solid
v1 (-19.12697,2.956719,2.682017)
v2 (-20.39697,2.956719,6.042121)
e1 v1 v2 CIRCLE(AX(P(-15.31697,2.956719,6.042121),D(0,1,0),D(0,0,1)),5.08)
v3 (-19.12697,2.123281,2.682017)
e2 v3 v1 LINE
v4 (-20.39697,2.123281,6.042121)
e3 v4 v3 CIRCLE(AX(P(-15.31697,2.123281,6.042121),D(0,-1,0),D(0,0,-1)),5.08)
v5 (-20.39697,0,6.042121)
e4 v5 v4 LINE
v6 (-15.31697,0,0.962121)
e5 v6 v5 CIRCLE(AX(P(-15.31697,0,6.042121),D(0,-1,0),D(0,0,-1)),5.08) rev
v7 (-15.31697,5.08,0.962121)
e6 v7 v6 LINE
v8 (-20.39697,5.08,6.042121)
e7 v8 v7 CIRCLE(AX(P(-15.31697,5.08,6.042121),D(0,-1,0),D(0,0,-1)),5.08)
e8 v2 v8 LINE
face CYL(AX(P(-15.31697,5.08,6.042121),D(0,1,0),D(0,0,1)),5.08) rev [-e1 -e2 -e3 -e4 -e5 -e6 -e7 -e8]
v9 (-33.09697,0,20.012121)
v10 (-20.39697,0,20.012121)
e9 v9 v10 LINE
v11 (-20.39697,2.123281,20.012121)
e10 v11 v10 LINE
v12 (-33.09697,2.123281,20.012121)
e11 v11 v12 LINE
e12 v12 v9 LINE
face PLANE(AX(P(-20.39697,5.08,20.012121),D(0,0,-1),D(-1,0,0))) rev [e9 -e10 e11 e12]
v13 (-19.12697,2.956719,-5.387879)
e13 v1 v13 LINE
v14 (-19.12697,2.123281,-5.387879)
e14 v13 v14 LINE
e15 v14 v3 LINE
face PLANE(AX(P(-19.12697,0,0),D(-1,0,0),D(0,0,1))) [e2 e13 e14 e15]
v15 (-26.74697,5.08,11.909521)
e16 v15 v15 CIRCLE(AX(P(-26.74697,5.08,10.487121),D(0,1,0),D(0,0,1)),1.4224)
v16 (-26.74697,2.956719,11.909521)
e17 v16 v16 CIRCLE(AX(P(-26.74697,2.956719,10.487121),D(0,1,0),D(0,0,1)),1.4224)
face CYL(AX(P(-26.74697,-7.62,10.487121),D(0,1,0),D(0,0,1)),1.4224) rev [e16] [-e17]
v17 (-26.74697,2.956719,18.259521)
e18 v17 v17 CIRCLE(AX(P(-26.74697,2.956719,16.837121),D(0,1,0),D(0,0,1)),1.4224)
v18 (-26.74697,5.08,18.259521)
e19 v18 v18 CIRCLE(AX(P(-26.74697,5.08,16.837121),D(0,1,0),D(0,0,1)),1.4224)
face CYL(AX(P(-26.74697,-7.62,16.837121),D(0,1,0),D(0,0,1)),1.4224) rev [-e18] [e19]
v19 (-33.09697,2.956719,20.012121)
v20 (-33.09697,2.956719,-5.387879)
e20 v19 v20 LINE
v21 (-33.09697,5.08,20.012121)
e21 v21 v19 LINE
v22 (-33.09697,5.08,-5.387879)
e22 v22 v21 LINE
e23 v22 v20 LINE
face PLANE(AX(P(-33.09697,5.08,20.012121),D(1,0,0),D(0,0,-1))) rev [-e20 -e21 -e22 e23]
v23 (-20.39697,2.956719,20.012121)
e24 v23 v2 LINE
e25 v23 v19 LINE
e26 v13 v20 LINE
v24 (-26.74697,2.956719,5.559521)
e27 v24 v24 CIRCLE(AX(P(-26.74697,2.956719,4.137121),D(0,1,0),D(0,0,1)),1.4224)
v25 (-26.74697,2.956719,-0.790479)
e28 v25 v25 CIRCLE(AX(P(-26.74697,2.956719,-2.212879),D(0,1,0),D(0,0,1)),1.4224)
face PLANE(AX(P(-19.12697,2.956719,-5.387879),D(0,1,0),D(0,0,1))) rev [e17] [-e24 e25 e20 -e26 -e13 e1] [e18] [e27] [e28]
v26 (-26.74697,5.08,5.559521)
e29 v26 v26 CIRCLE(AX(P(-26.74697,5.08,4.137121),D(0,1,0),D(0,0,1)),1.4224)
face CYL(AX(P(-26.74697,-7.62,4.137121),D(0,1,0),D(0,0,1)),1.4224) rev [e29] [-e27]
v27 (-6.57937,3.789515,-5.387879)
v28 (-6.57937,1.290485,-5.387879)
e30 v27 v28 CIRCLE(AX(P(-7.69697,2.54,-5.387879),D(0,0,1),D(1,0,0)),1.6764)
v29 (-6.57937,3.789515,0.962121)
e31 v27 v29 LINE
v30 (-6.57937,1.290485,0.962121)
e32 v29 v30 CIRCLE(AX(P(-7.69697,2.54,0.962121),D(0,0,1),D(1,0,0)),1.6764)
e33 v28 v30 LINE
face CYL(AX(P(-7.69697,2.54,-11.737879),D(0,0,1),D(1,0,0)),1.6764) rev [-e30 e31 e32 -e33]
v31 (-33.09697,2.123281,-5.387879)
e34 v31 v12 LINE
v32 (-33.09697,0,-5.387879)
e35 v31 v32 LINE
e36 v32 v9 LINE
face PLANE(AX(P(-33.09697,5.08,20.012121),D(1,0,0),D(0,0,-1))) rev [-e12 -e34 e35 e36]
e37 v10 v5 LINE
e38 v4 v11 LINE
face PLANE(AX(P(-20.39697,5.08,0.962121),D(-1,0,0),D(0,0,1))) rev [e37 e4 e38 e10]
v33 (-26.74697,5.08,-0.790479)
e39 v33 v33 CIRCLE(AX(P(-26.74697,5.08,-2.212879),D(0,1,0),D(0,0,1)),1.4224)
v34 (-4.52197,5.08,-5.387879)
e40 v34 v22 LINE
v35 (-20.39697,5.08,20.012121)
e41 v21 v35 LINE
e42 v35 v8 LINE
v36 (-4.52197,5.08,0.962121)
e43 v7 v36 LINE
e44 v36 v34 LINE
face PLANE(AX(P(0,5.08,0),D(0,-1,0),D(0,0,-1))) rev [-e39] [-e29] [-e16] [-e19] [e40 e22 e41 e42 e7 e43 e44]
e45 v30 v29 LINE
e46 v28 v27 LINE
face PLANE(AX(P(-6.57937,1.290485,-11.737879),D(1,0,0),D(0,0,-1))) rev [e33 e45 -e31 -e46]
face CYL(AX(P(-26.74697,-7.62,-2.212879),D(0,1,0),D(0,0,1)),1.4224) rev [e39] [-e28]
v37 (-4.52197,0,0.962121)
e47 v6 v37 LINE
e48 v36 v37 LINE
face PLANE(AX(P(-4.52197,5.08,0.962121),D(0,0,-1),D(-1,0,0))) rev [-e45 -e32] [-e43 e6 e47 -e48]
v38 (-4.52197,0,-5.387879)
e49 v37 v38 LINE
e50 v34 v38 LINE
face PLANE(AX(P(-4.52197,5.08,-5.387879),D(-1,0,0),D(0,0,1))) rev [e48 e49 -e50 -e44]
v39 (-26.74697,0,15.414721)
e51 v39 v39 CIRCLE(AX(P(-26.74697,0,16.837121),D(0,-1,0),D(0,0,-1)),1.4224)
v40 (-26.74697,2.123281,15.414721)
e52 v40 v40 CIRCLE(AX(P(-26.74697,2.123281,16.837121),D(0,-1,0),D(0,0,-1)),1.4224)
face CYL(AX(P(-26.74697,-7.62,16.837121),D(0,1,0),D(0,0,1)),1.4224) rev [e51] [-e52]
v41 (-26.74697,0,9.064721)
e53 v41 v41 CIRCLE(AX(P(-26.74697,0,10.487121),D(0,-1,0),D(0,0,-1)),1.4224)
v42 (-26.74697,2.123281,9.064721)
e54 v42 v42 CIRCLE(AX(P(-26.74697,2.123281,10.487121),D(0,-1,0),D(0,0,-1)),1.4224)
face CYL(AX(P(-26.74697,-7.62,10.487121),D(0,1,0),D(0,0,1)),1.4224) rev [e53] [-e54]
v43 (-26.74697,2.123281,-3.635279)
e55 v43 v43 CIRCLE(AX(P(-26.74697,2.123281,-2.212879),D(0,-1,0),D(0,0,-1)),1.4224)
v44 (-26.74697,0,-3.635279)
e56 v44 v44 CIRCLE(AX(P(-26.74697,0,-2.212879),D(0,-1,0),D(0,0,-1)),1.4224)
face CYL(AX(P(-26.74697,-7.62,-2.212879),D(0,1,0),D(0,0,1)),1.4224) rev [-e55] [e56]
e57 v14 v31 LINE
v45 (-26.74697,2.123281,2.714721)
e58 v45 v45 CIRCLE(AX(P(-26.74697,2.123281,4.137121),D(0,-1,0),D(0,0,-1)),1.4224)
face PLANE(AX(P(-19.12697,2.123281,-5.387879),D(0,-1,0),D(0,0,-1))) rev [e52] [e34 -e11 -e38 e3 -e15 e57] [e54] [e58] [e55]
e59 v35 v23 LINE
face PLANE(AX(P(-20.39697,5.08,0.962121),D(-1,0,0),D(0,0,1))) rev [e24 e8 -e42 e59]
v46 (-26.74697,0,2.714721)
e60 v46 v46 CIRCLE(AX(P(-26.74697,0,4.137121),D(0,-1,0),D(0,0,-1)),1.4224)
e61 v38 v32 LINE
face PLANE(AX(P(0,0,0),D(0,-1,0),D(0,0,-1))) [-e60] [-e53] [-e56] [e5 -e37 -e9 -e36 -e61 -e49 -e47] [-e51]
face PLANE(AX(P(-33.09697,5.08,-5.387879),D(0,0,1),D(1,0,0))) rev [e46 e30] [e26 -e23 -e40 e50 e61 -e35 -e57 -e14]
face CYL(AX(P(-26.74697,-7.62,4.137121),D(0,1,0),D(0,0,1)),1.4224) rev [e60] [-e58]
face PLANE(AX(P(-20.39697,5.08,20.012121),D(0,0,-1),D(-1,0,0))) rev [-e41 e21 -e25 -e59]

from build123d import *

# Parameters (mm, degrees)
BOSS_EXTRUDE1_DEPTH = 5.08
SKETCH2_W           = 25.4
SKETCH2_H           = 0.8334375
CUT_EXTRUDE1_DEPTH  = 13.97
SKETCH3_R           = 1.4224
CUT_EXTRUDE2_DEPTH  = 12.7
CUT_EXTRUDE3_DEPTH  = 12.7
FILLET3_R           = 5.08


with BuildPart() as part:
    # Sketch1 → Boss-Extrude1 (new body)
    with BuildSketch(Plane(origin=(0, 0, 0), x_dir=(1, 0, 0), z_dir=(0, 1, 0))):
        Polygon((-33.096969697, 5.387878788), (-20.396969697, 5.387878788), (-4.521969697, 5.387878788), (-4.521969697, -0.962121212), (-20.396969697, -0.962121212), (-20.396969697, -20.012121212), (-33.096969697, -20.012121212), align=None)
    extrude(amount=BOSS_EXTRUDE1_DEPTH)

    # Sketch2 → Cut-Extrude1 (cut)
    with BuildSketch(Plane.ZY.offset(33.096969697)):
        with Locations((7.312121212, 2.54)):
            Rectangle(SKETCH2_W, SKETCH2_H)
    extrude(amount=-CUT_EXTRUDE1_DEPTH, mode=Mode.SUBTRACT)

    # Sketch3 → Cut-Extrude2 (cut)
    with BuildSketch(Plane(origin=(0, 5.08, 0), x_dir=(1, 0, 0), z_dir=(0, 1, 0))):
        with Locations(Location((-26.746969697, -16.837121212, 0), (0, 0, 90))):
            Circle(SKETCH3_R)
        with Locations(Location((-26.746969697, -10.487121212, 0), (0, 0, 90))):
            Circle(SKETCH3_R)
        with Locations(Location((-26.746969697, -4.137121212, 0), (0, 0, 90))):
            Circle(SKETCH3_R)
        with Locations(Location((-26.746969697, 2.212878788, 0), (0, 0, 90))):
            Circle(SKETCH3_R)
    extrude(amount=-CUT_EXTRUDE2_DEPTH, mode=Mode.SUBTRACT)

    # Sketch5 → Cut-Extrude3 (cut)
    with BuildSketch(Plane.XY.offset(0.962121212)):
        with BuildLine():
            Line((-6.579369697, 1.290485214), (-6.579369697, 3.789514786))
            ThreePointArc((-6.579369697, 3.789514786), (-9.373369697, 2.54), (-6.579369697, 1.290485214))
        make_face()
    extrude(amount=-CUT_EXTRUDE3_DEPTH, mode=Mode.SUBTRACT)

    # Fillet3
    # the kernel refuses this fillet: 5.08 mm, written as the material it adds along each edge
    with BuildSketch(Plane(origin=(-20.396969697, -9.74328125, 0.962121212), x_dir=(1, 0, 0), z_dir=(0, 1, 0))) as fillet3_piece_1_section:
        with BuildLine():
            CenterArc((FILLET3_R, -FILLET3_R), FILLET3_R, 90, 90)
            Line((0, -FILLET3_R), (0, 0))
            Line((0, 0), (FILLET3_R, 0))
        make_face()
    fillet3_piece_1 = extrude(amount=14.82328125, mode=Mode.PRIVATE)
    fillet3_piece_1 = split(fillet3_piece_1, bisect_by=Plane(origin=(-18.050290176, 0, 1.370319311), z_dir=(0, 1, 0)), keep=Keep.TOP, mode=Mode.PRIVATE)
    fillet3_piece_1 = split(fillet3_piece_1, bisect_by=Plane(origin=(-18.050290176, 2.12328125, 1.370319311), z_dir=(0, -1, 0)), keep=Keep.TOP, mode=Mode.PRIVATE)
    fillet3_piece_1 = split(fillet3_piece_1, bisect_by=Plane(origin=(-19.126969697, 1.061640625, 1.370319311), z_dir=(1, 0, 0)), keep=Keep.TOP, mode=Mode.PRIVATE)
    add(fillet3_piece_1)
    with BuildSketch(Plane(origin=(-20.396969697, -9.74328125, 0.962121212), x_dir=(1, 0, 0), z_dir=(0, 1, 0))) as fillet3_piece_2_section:
        with BuildLine():
            CenterArc((FILLET3_R, -FILLET3_R), FILLET3_R, 90, 90)
            Line((0, -FILLET3_R), (0, 0))
            Line((0, 0), (FILLET3_R, 0))
        make_face()
    fillet3_piece_2 = extrude(amount=14.82328125, mode=Mode.PRIVATE)
    fillet3_piece_2 = split(fillet3_piece_2, bisect_by=Plane(origin=(-19.932991251, 0, 2.537596858), z_dir=(0, 1, 0)), keep=Keep.TOP, mode=Mode.PRIVATE)
    fillet3_piece_2 = split(fillet3_piece_2, bisect_by=Plane(origin=(-19.932991251, 2.12328125, 2.537596858), z_dir=(0, -1, 0)), keep=Keep.TOP, mode=Mode.PRIVATE)
    fillet3_piece_2 = split(fillet3_piece_2, bisect_by=Plane(origin=(-19.126969697, 1.061640625, 2.537596858), z_dir=(-1, 0, 0)), keep=Keep.TOP, mode=Mode.PRIVATE)
    add(fillet3_piece_2)
    with BuildSketch(Plane(origin=(-20.396969697, -9.74328125, 0.962121212), x_dir=(1, 0, 0), z_dir=(0, 1, 0))) as fillet3_piece_3_section:
        with BuildLine():
            CenterArc((FILLET3_R, -FILLET3_R), FILLET3_R, 90, 90)
            Line((0, -FILLET3_R), (0, 0))
            Line((0, 0), (FILLET3_R, 0))
        make_face()
    fillet3_piece_3 = extrude(amount=14.82328125, mode=Mode.PRIVATE)
    fillet3_piece_3 = split(fillet3_piece_3, bisect_by=Plane(origin=(-18.050290176, 2.12328125, 1.370319311), z_dir=(0, 1, 0)), keep=Keep.TOP, mode=Mode.PRIVATE)
    fillet3_piece_3 = split(fillet3_piece_3, bisect_by=Plane(origin=(-19.126969697, 2.54, 1.370319311), z_dir=(1, 0, 0)), keep=Keep.TOP, mode=Mode.PRIVATE)
    fillet3_piece_3 = split(fillet3_piece_3, bisect_by=Plane(origin=(-18.050290176, 2.95671875, 1.370319311), z_dir=(0, -1, 0)), keep=Keep.TOP, mode=Mode.PRIVATE)
    add(fillet3_piece_3)
    with BuildSketch(Plane(origin=(-20.396969697, 2.95671875, 0.962121212), x_dir=(1, 0, 0), z_dir=(0, 1, 0))) as fillet3_piece_4_section:
        with BuildLine():
            CenterArc((FILLET3_R, -FILLET3_R), FILLET3_R, 90, 90)
            Line((0, -FILLET3_R), (0, 0))
            Line((0, 0), (FILLET3_R, 0))
        make_face()
    fillet3_piece_4 = extrude(amount=2.12328125, mode=Mode.PRIVATE)
    fillet3_piece_4 = split(fillet3_piece_4, bisect_by=Plane(origin=(-19.126969697, 4.018359375, 1.370319311), z_dir=(1, 0, 0)), keep=Keep.TOP, mode=Mode.PRIVATE)
    add(fillet3_piece_4)
    with BuildSketch(Plane(origin=(-20.396969697, 2.95671875, 0.962121212), x_dir=(1, 0, 0), z_dir=(0, 1, 0))) as fillet3_piece_5_section:
        with BuildLine():
            CenterArc((FILLET3_R, -FILLET3_R), FILLET3_R, 90, 90)
            Line((0, -FILLET3_R), (0, 0))
            Line((0, 0), (FILLET3_R, 0))
        make_face()
    fillet3_piece_5 = extrude(amount=2.12328125, mode=Mode.PRIVATE)
    fillet3_piece_5 = split(fillet3_piece_5, bisect_by=Plane(origin=(-19.126969697, 4.018359375, 2.537596858), z_dir=(-1, 0, 0)), keep=Keep.TOP, mode=Mode.PRIVATE)
    add(fillet3_piece_5)
    with BuildSketch(Plane(origin=(-20.396969697, 0, 0.962121212), x_dir=(1, 0, 0), z_dir=(0, 1, 0))) as fillet3_piece_6_section:
        with BuildLine():
            CenterArc((FILLET3_R, -FILLET3_R), FILLET3_R, 90, 90)
            Line((0, -FILLET3_R), (0, 0))
            Line((0, 0), (FILLET3_R, 0))
        make_face()
    fillet3_piece_6 = extrude(amount=2.12328125, mode=Mode.PRIVATE)
    fillet3_piece_6 = split(fillet3_piece_6, bisect_by=Plane(origin=(-19.126969697, 1.061640625, 1.370319311), z_dir=(1, 0, 0)), keep=Keep.TOP, mode=Mode.PRIVATE)
    add(fillet3_piece_6)
    with BuildSketch(Plane(origin=(-20.396969697, 0, 0.962121212), x_dir=(1, 0, 0), z_dir=(0, 1, 0))) as fillet3_piece_7_section:
        with BuildLine():
            CenterArc((FILLET3_R, -FILLET3_R), FILLET3_R, 90, 90)
            Line((0, -FILLET3_R), (0, 0))
            Line((0, 0), (FILLET3_R, 0))
        make_face()
    fillet3_piece_7 = extrude(amount=2.12328125, mode=Mode.PRIVATE)
    fillet3_piece_7 = split(fillet3_piece_7, bisect_by=Plane(origin=(-19.126969697, 1.061640625, 2.537596858), z_dir=(-1, 0, 0)), keep=Keep.TOP, mode=Mode.PRIVATE)
    add(fillet3_piece_7)
    with BuildSketch(Plane(origin=(-20.396969697, 0, 0.962121212), x_dir=(1, 0, 0), z_dir=(0, 1, 0))) as fillet3_piece_8_section:
        with BuildLine():
            CenterArc((FILLET3_R, -FILLET3_R), FILLET3_R, 90, 90)
            Line((0, -FILLET3_R), (0, 0))
            Line((0, 0), (FILLET3_R, 0))
        make_face()
    fillet3_piece_8 = extrude(amount=14.82328125, mode=Mode.PRIVATE)
    fillet3_piece_8 = split(fillet3_piece_8, bisect_by=Plane(origin=(-18.050290176, 2.12328125, 1.370319311), z_dir=(0, 1, 0)), keep=Keep.TOP, mode=Mode.PRIVATE)
    fillet3_piece_8 = split(fillet3_piece_8, bisect_by=Plane(origin=(-19.126969697, 2.54, 1.370319311), z_dir=(1, 0, 0)), keep=Keep.TOP, mode=Mode.PRIVATE)
    fillet3_piece_8 = split(fillet3_piece_8, bisect_by=Plane(origin=(-18.050290176, 2.95671875, 1.370319311), z_dir=(0, -1, 0)), keep=Keep.TOP, mode=Mode.PRIVATE)
    add(fillet3_piece_8)
    with BuildSketch(Plane(origin=(-20.396969697, 0, 0.962121212), x_dir=(1, 0, 0), z_dir=(0, 1, 0))) as fillet3_piece_9_section:
        with BuildLine():
            CenterArc((FILLET3_R, -FILLET3_R), FILLET3_R, 90, 90)
            Line((0, -FILLET3_R), (0, 0))
            Line((0, 0), (FILLET3_R, 0))
        make_face()
    fillet3_piece_9 = extrude(amount=14.82328125, mode=Mode.PRIVATE)
    fillet3_piece_9 = split(fillet3_piece_9, bisect_by=Plane(origin=(-18.050290176, 5.08, 1.370319311), z_dir=(0, -1, 0)), keep=Keep.TOP, mode=Mode.PRIVATE)
    fillet3_piece_9 = split(fillet3_piece_9, bisect_by=Plane(origin=(-19.126969697, 4.018359375, 1.370319311), z_dir=(1, 0, 0)), keep=Keep.TOP, mode=Mode.PRIVATE)
    fillet3_piece_9 = split(fillet3_piece_9, bisect_by=Plane(origin=(-18.050290176, 2.95671875, 1.370319311), z_dir=(0, 1, 0)), keep=Keep.TOP, mode=Mode.PRIVATE)
    add(fillet3_piece_9)
    with BuildSketch(Plane(origin=(-20.396969697, 0, 0.962121212), x_dir=(1, 0, 0), z_dir=(0, 1, 0))) as fillet3_piece_10_section:
        with BuildLine():
            CenterArc((FILLET3_R, -FILLET3_R), FILLET3_R, 90, 90)
            Line((0, -FILLET3_R), (0, 0))
            Line((0, 0), (FILLET3_R, 0))
        make_face()
    fillet3_piece_10 = extrude(amount=14.82328125, mode=Mode.PRIVATE)
    fillet3_piece_10 = split(fillet3_piece_10, bisect_by=Plane(origin=(-19.932991251, 5.08, 2.537596858), z_dir=(0, -1, 0)), keep=Keep.TOP, mode=Mode.PRIVATE)
    fillet3_piece_10 = split(fillet3_piece_10, bisect_by=Plane(origin=(-19.126969697, 4.018359375, 2.537596858), z_dir=(-1, 0, 0)), keep=Keep.TOP, mode=Mode.PRIVATE)
    fillet3_piece_10 = split(fillet3_piece_10, bisect_by=Plane(origin=(-19.932991251, 2.95671875, 2.537596858), z_dir=(0, 1, 0)), keep=Keep.TOP, mode=Mode.PRIVATE)
    add(fillet3_piece_10)


solid = part.part
